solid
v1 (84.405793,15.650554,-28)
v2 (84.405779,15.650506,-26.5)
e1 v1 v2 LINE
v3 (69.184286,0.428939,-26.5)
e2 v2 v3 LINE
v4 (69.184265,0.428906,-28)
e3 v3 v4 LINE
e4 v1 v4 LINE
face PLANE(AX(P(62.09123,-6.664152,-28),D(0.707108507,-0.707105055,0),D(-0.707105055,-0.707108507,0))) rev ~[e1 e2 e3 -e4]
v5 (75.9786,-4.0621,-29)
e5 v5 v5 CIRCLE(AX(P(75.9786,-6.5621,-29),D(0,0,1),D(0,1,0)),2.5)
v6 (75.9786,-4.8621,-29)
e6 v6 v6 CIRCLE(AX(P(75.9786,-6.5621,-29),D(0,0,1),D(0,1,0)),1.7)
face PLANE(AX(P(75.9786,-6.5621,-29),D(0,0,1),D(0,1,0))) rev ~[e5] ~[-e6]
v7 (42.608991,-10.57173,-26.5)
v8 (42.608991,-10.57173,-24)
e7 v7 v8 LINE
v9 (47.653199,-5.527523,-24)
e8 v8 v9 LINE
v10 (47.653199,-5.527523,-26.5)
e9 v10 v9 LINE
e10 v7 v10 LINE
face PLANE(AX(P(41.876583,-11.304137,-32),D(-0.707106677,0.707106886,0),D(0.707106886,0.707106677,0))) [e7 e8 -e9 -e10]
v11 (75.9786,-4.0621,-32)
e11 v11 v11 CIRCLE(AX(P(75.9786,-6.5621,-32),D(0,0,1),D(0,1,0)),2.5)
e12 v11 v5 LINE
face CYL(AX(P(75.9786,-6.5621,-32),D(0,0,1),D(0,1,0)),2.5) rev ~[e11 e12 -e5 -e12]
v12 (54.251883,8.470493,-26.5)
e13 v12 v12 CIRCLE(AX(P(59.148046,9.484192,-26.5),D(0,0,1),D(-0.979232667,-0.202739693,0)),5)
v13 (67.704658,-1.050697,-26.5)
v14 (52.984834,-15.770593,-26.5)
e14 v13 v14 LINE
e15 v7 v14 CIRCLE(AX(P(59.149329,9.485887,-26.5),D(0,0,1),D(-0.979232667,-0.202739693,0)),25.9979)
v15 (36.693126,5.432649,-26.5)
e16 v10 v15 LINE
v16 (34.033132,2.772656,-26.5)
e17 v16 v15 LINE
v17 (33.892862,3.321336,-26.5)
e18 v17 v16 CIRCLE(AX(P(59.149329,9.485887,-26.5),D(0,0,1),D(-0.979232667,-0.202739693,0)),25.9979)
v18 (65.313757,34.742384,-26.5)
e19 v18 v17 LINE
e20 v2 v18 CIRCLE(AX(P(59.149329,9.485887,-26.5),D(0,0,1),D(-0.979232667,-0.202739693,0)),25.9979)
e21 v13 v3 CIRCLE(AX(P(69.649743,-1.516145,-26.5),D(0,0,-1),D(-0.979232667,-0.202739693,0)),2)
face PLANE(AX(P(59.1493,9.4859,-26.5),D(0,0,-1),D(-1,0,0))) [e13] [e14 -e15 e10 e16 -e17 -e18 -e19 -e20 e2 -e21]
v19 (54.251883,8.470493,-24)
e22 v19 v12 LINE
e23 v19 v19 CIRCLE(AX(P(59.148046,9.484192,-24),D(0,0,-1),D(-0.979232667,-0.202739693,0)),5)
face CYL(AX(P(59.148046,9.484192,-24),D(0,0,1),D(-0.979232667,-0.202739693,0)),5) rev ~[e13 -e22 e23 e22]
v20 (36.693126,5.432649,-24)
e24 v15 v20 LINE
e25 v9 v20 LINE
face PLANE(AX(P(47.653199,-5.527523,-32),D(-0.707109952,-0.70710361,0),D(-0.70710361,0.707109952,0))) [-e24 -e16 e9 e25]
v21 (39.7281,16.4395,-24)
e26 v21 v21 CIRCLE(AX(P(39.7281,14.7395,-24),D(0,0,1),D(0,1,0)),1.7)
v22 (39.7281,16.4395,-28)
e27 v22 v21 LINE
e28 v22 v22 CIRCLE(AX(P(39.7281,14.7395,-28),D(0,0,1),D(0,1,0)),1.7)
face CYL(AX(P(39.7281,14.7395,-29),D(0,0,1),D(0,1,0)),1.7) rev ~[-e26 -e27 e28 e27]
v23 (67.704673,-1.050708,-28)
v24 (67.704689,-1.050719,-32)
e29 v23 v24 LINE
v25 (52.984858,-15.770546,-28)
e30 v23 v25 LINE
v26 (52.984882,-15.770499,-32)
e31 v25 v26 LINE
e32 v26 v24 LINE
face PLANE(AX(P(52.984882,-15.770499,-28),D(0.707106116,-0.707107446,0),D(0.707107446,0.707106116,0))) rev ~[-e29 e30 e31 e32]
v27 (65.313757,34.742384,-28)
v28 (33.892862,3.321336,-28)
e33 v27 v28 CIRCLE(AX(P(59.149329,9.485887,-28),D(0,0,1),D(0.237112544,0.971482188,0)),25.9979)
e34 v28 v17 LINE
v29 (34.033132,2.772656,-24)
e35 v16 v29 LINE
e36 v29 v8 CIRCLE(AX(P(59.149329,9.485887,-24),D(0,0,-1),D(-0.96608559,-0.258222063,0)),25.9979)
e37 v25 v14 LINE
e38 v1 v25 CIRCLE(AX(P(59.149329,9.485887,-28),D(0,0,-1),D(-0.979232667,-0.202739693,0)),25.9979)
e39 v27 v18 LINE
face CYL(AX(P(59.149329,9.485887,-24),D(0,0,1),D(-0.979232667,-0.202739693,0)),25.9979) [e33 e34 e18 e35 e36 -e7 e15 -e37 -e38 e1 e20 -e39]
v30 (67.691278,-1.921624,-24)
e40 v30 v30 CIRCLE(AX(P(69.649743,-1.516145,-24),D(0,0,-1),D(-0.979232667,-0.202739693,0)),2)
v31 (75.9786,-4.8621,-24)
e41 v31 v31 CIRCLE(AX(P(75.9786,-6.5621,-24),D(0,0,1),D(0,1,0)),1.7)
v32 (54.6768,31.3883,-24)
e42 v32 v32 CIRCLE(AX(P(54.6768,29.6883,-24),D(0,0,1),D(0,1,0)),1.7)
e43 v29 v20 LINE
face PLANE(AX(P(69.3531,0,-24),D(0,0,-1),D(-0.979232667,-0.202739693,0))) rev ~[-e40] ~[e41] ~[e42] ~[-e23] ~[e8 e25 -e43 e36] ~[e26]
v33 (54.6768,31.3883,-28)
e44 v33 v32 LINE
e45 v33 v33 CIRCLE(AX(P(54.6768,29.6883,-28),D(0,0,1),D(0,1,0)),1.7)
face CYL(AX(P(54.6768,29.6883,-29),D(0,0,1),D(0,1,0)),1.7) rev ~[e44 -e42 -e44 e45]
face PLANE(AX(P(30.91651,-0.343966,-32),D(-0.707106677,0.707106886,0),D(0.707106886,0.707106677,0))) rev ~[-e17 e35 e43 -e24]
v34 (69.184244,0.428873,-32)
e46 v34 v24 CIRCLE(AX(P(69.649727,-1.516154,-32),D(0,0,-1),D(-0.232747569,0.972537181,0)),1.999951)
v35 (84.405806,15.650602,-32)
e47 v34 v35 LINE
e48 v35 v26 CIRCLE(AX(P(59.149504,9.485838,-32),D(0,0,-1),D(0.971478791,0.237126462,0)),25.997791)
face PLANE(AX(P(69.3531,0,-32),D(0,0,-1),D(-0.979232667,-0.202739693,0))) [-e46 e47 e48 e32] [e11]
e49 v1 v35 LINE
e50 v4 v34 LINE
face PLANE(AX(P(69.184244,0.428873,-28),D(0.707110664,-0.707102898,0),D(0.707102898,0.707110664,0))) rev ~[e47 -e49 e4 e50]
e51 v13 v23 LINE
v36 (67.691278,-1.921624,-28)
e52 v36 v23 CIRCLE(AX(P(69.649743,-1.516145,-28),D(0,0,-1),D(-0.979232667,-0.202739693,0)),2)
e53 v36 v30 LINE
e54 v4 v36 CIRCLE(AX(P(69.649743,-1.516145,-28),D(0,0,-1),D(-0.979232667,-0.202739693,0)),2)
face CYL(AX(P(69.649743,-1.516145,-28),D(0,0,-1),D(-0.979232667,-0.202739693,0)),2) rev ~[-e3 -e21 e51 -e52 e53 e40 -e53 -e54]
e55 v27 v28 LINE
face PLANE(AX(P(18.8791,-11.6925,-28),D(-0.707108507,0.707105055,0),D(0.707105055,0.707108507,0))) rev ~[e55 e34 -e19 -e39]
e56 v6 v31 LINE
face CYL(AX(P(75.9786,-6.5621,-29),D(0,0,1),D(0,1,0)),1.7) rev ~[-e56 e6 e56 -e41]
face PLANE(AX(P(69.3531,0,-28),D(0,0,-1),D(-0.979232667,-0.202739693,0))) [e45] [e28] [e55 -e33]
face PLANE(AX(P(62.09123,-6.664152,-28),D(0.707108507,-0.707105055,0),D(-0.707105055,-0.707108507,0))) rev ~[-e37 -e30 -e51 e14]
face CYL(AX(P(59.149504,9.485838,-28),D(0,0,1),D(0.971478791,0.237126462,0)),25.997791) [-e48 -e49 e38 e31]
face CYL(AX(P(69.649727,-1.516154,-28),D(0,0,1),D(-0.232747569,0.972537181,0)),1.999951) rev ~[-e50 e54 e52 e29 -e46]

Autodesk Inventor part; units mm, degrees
ref_plane "YZ Plane" through (0, 0, 0) normal (1, 0, 0) x (0, 1, 0)
ref_plane "XZ Plane" through (0, 0, 0) normal (0, 1, 0) x (-1, 0, 0)
ref_plane "Work Plane1" through (69.3531, 0, -24) normal (0, 0, -1) x (-0.9792327, -0.2027397, 0)
sketch "Sketch1" plane through (69.3531, 0, -24) normal (0, 0, -1) x (-0.9792327, -0.2027397, 0)
  circle A0 centre (8.0687, 11.3576) radius 25.9979 projected
  circle A1 centre (8.0703, 11.3562) radius 3.8103 projected
  circle A2 centre (8.0703, 11.3562) radius 5
  point P0 (67.9128, 14.0606)
  dimension "d0" = 10
extrude "Extrusion1" add sketch "Sketch1" along normal blind 4 contours A0
sketch "Sketch2" plane through (59.1493, 9.4859, -28) normal (0, 0, -1) x (-1, 0, 0)
  line L0 (59.1493, -50.593) -> (59.1493, 54.0449) projected
  line L1 (-54.0467, -9.4859) -> (50.5907, -9.4859) projected
  line L2 (-15.9479, -15.1669) -> (4.4725, 20.2023)
  line L3 (4.4725, 20.2023) -> (19.4213, 5.2535)
  line L4 (19.4213, 5.2535) -> (-15.9479, -15.1669)
  line L5 (-39.0985, 39.0967) -> (35.6425, -35.6447)
  line L6 (-0.781, 0) -> (9.2905, 10.0715)
  line L7 (-0.781, 0) -> (13.4622, 0) construction
  line L8 (-15.9479, -15.1669) -> (-0.781, 0)
  circle A0 centre (4.4725, 20.2023) radius 1.6
  circle A1 centre (19.4213, 5.2535) radius 1.6
  circle A2 centre (-15.9479, -15.1669) radius 1.6 construction
  circle A3 centre (-16.8292, -16.048) radius 1.5
  dimension "d17" = 18
  dimension "d18" = 22
  dimension "d19" = 30
  dimension "d20" = 45
  dimension "d21" = 15
  dimension "d22" = 3.2
  dimension "d23" = 3.2
  dimension "d24" = 3.2
  dimension "d39" = 3
extrude "Extrusion2" cut sketch "Sketch2" against normal blind 3.4 contours A3 L8 L2 | L2 L4 A3 | A3 L4 L8 | A0 L3 L2 | L2 L3 A0 | A1 L3 L4 | L4 L3 A1
sketch "Sketch3" plane through (59.1493, 9.4859, -28) normal (0, 0, -1) x (-1, 0, 0)
  line L0 (-35.7047, 22.4019) -> (13.1872, -35.1292) projected
  line L1 (32.542, -18.6808) -> (-16.3499, 38.8503) projected
  line L2 (40.2702, -21.1784) -> (-21.1782, 40.2703)
  line L3 (-21.1782, 40.2703) -> (-40.2702, 21.1784)
  line L4 (-40.2702, 21.1784) -> (21.1782, -40.2703)
  line L5 (21.1782, -40.2703) -> (40.2702, -21.1784)
  line L6 (40.2702, -21.1784) -> (-40.2702, 21.1784) construction
  line L7 (-21.1782, 40.2703) -> (21.1782, -40.2703) construction
  point P0 (0, 0)
  dimension "d16" = 27
extrude "Extrusion3" cut sketch "Sketch3" against normal blind 1.5
sketch "Sketch4" plane through (69.3531, 0, -28) normal (0, 0, -1) x (-0.9792327, -0.2027397, 0)
  circle A0 centre (0.0169, -1.5448) radius 2 projected
extrude "Extrusion4" cut sketch "Sketch4" against normal blind 25.4
sketch "Sketch6" plane through (69.3531, 0, -28) normal (0, 0, -1) x (-0.9792327, -0.2027397, 0)
  line L0 (-28.7292, -8.8539) -> (-25.804, -10.7757) projected
  line L1 (-20.2187, 4.1006) -> (-28.7292, -8.8539) projected
  line L2 (-20.2187, 4.1006) -> (-17.2935, 2.1789) projected
  circle A0 centre (-5.1575, -7.7691) radius 1.5 projected
  line L3 (0.0784, 0.4542) -> (-17.9131, 12.2738) projected
  arc A1 (-17.9131, 12.2738) -> (19.2256, -12.1245) centre (8.0687, 11.3576) ccw projected
  line L4 (-28.7292, -8.8539) -> (-20.2187, 4.1006)
  line L5 (-20.2187, 4.1006) -> (-38.152, 15.8819)
  line L6 (-38.152, 15.8819) -> (-46.6625, 2.9274)
  line L7 (-46.6625, 2.9274) -> (-28.7292, -8.8539)
  line L8 (-52.6907, 6.8876) -> (-44.1802, 19.8422)
  line L9 (-44.1802, 19.8422) -> (-14.4793, 0.3302)
  line L10 (-37.9848, 15.7721) -> (-46.4954, 2.8175)
  line L11 (-46.4954, 2.8175) -> (-42228058.7703, 27741750.5128)
  line L12 (-42228058.7703, 27741750.5128) -> (-52.6907, 6.8876)
  line L13 (-14.4793, 0.3302) -> (-37.9848, 15.7721)
  circle A2 centre (-5.1575, -7.7691) radius 1.5 projected
  circle A3 centre (-5.1575, -7.7691) radius 1.7
  circle A4 centre (26.0215, 20.4395) radius 2.75 projected
  circle A5 centre (8.3525, 32.0472) radius 2.45 projected
  circle A6 centre (26.0215, 20.4395) radius 1.6
  circle A7 centre (8.3525, 32.0472) radius 1.6
  arc A8 (0.0784, 0.4542) -> (1.8272, -0.6947) centre (0.0169, -1.5448) ccw projected
  line L14 (19.2256, -12.1245) -> (1.8272, -0.6947) projected
  point P0 (67.9128, 14.0606)
  point P1 (8.0213, -4.7639)
  point P2 (-4.9332, 3.7467)
  dimension "d44" = 0
  dimension "d47" = 0
  dimension "d48" = 3.4
  dimension "d49" = 3.2
  dimension "d50" = 3.2
extrude "Extrusion6" add sketch "Sketch6" along normal blind 4 contours A8 L14 A1 L3 | A3
sketch "Sketch7" plane through (69.3531, 0, -32) normal (0, 0, -1) x (-0.9792327, -0.2027397, 0)
  circle A0 centre (-5.1575, -7.7691) radius 2.45 projected
  circle A1 centre (8.3525, 32.0472) radius 2.75 projected
  circle A2 centre (26.0215, 20.4395) radius 2.75 projected
  point P0 (67.9128, 14.0606)
hole "Hole1" at (39.7281, 14.7395, -32) at (54.6768, 29.6883, -32) at (75.9786, -6.5621, -32) direction (0, 0, 1) diameter 3.4 end through all counterbore diameter 5 counterbore depth 3
sketch "Sketch8" plane through (69.3531, 0, -32) normal (0, 0, -1) x (-0.9792327, -0.2027397, 0)
  line L0 (22.3699, -1.0133) -> (13.834, 4.5943) projected
  line L1 (13.834, 4.5943) -> (22.3444, 17.5489) projected
  line L2 (30.8803, 11.9413) -> (22.3444, 17.5489) projected
  line L3 (22.3699, -1.0133) -> (30.8803, 11.9413) projected
  line L4 (29.1977, -5.4988) -> (37.7081, 7.4558) projected
  line L5 (29.1977, -5.4988) -> (22.3699, -1.0133) projected
  line L6 (37.7081, 7.4558) -> (30.8803, 11.9413) projected
  line L7 (29.1977, -5.4988) -> (37.7081, 7.4558)
  line L8 (37.7081, 7.4558) -> (48.711, 0.2276)
  line L9 (48.711, 0.2276) -> (40.2006, -12.7271)
  line L10 (40.2006, -12.7271) -> (29.1977, -5.4988)
  point P0 (67.9128, 14.0606)
  point P1 (11.3572, 0.3138)
  point P2 (-1.5974, 8.8243)
  point P3 (14.9357, 6.2713)
ref_plane "Work Plane2" through (12.9398, -24.5988, -20.5) normal (0, 0, 1) x (0.7071087, 0.7071049, 0)
extrude "Extrusion7" cut sketch "Sketch8" against normal up to surface (11.5 mm away) contours L3 L6 L4 L5
properties part number "Matchboxscope_sample_v0"
